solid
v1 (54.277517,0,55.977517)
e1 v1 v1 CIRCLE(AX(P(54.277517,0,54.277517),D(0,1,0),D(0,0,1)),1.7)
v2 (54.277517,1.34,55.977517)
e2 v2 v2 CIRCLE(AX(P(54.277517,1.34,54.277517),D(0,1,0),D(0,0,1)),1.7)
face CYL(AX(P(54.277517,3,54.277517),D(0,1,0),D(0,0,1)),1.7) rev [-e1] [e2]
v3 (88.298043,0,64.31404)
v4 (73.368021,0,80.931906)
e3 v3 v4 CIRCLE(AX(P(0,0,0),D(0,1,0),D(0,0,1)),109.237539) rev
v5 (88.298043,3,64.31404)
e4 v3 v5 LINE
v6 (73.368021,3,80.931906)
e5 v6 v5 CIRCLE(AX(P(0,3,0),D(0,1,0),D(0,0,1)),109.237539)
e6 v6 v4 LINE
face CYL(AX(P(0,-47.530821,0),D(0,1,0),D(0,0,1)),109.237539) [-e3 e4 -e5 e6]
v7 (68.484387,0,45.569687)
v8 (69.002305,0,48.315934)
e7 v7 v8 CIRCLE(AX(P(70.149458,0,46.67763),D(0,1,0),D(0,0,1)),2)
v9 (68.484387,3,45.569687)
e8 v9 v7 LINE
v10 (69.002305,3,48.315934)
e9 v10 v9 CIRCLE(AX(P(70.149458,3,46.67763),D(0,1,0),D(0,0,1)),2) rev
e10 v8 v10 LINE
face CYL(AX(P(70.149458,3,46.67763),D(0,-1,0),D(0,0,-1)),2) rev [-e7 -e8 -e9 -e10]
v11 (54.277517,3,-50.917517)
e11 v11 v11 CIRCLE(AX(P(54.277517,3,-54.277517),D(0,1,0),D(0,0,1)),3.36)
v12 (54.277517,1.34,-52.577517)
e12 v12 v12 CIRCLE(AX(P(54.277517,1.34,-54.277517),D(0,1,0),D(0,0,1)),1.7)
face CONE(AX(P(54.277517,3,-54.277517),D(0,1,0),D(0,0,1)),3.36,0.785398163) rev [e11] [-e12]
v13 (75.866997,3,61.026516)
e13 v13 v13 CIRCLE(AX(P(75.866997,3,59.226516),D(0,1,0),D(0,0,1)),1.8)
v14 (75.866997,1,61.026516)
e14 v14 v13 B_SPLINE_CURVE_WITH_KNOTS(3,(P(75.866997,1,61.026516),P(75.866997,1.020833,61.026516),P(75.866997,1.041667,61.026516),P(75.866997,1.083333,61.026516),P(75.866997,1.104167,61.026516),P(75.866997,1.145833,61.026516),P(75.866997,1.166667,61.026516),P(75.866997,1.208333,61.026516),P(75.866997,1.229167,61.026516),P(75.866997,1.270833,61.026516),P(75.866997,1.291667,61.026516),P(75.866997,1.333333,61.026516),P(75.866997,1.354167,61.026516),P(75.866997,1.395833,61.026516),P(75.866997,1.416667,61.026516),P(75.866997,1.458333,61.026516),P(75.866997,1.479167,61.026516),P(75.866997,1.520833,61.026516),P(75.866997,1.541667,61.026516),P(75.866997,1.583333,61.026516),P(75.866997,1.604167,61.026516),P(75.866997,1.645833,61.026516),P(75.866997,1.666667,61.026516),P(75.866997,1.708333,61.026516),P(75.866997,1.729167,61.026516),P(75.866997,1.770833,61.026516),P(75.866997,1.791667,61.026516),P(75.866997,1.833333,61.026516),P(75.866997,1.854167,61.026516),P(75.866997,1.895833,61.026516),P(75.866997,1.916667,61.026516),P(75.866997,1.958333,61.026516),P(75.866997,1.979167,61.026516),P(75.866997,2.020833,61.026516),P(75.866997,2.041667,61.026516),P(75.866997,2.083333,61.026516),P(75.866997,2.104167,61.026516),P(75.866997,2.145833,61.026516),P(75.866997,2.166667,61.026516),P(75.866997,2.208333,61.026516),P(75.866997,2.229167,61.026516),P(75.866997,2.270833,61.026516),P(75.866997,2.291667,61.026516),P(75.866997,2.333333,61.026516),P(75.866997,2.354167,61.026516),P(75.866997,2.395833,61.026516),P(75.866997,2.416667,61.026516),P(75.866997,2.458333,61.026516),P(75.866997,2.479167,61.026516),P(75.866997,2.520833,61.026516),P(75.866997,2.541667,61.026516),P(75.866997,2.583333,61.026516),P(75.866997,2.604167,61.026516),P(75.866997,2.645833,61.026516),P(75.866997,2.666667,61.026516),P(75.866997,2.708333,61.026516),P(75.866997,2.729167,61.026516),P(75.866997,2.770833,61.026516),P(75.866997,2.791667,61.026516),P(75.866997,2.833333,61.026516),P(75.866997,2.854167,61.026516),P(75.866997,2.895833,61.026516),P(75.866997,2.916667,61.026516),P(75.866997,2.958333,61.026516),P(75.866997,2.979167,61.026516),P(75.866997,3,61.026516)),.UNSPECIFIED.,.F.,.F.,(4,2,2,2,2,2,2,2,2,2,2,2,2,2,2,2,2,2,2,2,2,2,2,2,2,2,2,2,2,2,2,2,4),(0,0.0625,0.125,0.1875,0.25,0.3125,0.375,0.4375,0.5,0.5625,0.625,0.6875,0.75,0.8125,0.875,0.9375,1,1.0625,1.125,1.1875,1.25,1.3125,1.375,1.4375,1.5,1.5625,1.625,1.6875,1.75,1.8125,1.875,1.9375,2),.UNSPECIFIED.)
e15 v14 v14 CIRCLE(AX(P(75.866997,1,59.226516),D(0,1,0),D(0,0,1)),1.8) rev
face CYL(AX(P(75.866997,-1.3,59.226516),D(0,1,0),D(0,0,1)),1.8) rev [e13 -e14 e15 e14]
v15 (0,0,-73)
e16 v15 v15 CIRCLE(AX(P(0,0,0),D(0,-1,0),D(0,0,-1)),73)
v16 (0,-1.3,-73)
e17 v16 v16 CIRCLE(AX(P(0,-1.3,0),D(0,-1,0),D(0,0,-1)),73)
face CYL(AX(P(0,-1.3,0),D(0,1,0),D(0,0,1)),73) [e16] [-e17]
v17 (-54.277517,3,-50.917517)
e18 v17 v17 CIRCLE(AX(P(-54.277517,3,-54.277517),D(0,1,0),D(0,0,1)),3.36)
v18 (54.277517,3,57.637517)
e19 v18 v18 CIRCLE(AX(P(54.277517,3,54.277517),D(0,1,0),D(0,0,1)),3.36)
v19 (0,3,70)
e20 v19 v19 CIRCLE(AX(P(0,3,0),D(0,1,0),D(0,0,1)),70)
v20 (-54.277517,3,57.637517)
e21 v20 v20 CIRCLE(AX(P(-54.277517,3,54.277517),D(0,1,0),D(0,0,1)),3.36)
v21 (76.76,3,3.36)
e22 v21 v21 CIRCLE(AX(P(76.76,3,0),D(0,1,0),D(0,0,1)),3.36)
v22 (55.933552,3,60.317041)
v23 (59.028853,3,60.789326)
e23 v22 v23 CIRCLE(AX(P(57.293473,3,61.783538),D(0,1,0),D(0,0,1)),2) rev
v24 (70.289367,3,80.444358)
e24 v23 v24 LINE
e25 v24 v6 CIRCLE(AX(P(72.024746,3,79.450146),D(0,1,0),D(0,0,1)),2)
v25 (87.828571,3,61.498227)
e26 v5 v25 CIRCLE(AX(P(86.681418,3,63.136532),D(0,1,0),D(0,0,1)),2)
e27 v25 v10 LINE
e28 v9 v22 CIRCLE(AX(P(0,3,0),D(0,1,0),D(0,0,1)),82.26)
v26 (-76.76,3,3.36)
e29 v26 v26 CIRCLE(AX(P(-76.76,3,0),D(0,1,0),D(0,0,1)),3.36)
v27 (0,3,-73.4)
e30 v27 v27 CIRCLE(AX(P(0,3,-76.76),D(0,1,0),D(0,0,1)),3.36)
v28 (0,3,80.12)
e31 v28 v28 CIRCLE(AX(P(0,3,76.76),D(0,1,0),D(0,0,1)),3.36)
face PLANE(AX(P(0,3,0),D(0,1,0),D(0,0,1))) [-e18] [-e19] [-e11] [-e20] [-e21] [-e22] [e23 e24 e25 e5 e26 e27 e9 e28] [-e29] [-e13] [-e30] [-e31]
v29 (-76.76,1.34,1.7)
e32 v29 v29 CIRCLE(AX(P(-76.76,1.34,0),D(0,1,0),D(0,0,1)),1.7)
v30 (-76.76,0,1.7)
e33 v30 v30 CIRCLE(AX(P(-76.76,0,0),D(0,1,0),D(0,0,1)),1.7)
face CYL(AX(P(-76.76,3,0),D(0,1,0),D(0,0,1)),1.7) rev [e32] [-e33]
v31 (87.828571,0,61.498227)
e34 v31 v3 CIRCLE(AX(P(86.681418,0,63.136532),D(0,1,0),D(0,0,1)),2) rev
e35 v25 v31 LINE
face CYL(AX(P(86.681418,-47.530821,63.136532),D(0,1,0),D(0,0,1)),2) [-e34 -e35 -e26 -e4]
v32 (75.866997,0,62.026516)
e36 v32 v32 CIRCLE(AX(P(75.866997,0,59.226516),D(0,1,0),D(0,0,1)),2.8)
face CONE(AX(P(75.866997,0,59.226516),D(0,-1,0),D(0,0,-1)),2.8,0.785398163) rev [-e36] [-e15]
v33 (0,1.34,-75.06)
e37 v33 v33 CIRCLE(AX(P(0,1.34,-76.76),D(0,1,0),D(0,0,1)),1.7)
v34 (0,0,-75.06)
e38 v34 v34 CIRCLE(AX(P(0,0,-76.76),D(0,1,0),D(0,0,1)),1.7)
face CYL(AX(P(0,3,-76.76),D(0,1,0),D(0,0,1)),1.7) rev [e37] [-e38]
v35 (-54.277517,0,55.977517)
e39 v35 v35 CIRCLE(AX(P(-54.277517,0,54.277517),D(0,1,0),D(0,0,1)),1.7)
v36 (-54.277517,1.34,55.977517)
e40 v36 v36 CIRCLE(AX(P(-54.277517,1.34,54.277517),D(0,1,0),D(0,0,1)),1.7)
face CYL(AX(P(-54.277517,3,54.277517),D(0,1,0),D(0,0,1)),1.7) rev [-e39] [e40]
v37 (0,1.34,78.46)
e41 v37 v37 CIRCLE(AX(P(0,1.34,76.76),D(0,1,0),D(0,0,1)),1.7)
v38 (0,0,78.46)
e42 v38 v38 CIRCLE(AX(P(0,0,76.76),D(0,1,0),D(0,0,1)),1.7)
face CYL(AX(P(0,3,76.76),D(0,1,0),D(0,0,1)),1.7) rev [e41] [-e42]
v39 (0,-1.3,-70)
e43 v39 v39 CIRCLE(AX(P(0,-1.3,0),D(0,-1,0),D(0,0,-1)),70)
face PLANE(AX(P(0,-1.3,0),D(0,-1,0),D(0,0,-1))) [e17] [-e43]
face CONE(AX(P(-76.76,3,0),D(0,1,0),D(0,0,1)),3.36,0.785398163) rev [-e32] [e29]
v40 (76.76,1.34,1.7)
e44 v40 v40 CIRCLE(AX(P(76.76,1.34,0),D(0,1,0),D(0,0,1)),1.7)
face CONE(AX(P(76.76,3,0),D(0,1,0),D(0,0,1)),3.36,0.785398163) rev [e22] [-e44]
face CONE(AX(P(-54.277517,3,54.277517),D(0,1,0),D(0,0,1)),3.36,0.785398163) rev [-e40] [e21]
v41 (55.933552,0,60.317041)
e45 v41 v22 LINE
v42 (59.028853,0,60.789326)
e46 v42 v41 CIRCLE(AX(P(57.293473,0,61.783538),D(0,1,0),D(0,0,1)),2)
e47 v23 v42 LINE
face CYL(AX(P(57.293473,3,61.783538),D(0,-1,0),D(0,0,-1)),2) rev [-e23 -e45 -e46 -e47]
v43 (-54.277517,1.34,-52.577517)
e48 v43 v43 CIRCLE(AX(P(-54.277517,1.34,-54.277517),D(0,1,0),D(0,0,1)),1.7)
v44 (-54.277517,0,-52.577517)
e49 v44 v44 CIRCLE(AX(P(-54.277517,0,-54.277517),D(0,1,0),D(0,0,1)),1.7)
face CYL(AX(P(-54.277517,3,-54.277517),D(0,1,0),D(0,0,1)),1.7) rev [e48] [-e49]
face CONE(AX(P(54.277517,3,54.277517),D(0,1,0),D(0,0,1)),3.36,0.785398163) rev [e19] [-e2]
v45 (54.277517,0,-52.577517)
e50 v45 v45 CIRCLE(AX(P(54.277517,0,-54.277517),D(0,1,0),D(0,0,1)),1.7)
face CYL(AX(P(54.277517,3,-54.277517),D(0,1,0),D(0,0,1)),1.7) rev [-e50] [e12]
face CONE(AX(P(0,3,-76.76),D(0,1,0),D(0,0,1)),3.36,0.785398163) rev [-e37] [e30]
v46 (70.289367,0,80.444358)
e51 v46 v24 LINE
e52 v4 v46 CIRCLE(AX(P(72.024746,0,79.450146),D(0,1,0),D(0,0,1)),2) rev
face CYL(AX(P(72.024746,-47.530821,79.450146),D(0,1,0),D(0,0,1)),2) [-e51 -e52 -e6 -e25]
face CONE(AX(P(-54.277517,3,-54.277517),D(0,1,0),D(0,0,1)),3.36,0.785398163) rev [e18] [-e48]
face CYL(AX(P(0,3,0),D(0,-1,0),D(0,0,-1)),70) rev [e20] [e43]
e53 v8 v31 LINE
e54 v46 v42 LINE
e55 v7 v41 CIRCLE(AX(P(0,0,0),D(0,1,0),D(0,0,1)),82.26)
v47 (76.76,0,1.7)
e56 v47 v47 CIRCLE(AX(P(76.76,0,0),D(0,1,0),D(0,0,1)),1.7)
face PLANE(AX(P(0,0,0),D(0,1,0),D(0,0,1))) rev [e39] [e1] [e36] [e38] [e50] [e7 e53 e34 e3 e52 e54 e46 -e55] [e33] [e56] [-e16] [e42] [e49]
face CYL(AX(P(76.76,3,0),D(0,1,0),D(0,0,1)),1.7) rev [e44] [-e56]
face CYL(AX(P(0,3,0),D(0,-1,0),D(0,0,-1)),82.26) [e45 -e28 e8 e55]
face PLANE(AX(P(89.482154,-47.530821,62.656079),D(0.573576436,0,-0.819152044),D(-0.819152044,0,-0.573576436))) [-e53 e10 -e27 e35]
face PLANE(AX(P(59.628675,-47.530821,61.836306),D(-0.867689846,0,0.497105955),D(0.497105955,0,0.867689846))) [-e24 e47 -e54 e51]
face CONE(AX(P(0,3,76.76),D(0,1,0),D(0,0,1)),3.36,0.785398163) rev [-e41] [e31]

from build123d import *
from build123d.topology import SkipClean

# Parameters (mm, degrees)
ESBO_O1_R                                    = 82.26
ESBO_O1_R_2                                  = 70
RESSALTO_EXTRUS_O1_DEPTH                     = 3
RESSALTO_EXTRUS_O2_START                     = 1.3
ESBO_O2_R                                    = 73
ESBO_O2_R_2                                  = 70
RESSALTO_EXTRUS_O2_DEPTH                     = 1.3
ESCAREADO_PARA_PARAFUSO_ALLEN_SEXTAV_2_COUNT = 2
ESCAREADO_PARA_PARAFUSO_ALLEN_SEXTAV_2_PITCH = 76.76
ESCAREADO_PARA_PARAFUSO_ALLEN_SEXTAV_3_COUNT = 2
ESCAREADO_PARA_PARAFUSO_ALLEN_SEXTAV_3_PITCH = 76.76
ESCAREADO_PARA_PARAFUSO_ALLEN_SEXTAV_4_COUNT = 2
ESCAREADO_PARA_PARAFUSO_ALLEN_SEXTAV_4_PITCH = 76.76
ESCAREADO_PARA_PARAFUSO_ALLEN_SEXTAV_5_COUNT = 2
ESCAREADO_PARA_PARAFUSO_ALLEN_SEXTAV_5_PITCH = 76.76
ESCAREADO_PARA_PARAFUSO_ALLEN_SEXTAV_6_COUNT = 2
ESCAREADO_PARA_PARAFUSO_ALLEN_SEXTAV_6_PITCH = 76.76
ESCAREADO_PARA_PARAFUSO_ALLEN_SEXTAV_7_COUNT = 2
ESCAREADO_PARA_PARAFUSO_ALLEN_SEXTAV_7_PITCH = 76.76
ESCAREADO_PARA_PARAFUSO_ALLEN_SEXTAV_8_COUNT = 2
ESCAREADO_PARA_PARAFUSO_ALLEN_SEXTAV_8_PITCH = 76.76
ESCAREADO_PARA_PARAFUSO_ALLEN_SEXTAV_9_COUNT = 2
ESCAREADO_PARA_PARAFUSO_ALLEN_SEXTAV_9_PITCH = 76.76
RESSALTO_EXTRUS_O3_START                     = -3
RESSALTO_EXTRUS_O3_DEPTH                     = 3
FILETE1_R                                    = 2
ESBO_O9_R                                    = 1.8
CORTE_EXTRUS_O3_DEPTH                        = 122.035496877
CHANFRO2_SIZE                                = 1


with BuildPart() as part:
    # Esboço1 → Ressalto-extrusão1 (new body)
    with BuildSketch(Plane(origin=(0, 0, 0), x_dir=(1, 0, 0), z_dir=(0, 1, 0))):
        with Locations(Location((0, 0, 0), (0, 0, 270))):
            Circle(ESBO_O1_R)
        with Locations(Location((0, 0, 0), (0, 0, 270))):
            Circle(ESBO_O1_R_2, mode=Mode.SUBTRACT)
    extrude(amount=RESSALTO_EXTRUS_O1_DEPTH)

    # Esboço2 → Ressalto-extrusão2 (add)
    with SkipClean():  # the faces are left unmerged after this step: merging them gives an invalid solid
        with BuildSketch(Plane.XZ.offset(RESSALTO_EXTRUS_O2_START)):
            with Locations(Location((0, 0, 0), (0, 0, 270))):
                Circle(ESBO_O2_R)
            with Locations(Location((0, 0, 0), (0, 0, 270))):
                Circle(ESBO_O2_R_2, mode=Mode.SUBTRACT)
        extrude(amount=-RESSALTO_EXTRUS_O2_DEPTH)

    # Esboço4 → Escareado para parafuso Allen sextavado escareado de M31 (revolve, cut)
    with SkipClean():  # the faces are left unmerged after this step: merging them gives an invalid solid
        with BuildSketch(Plane(origin=(0, 3, 0), x_dir=(0, 0, 1), z_dir=(1, 0, 0))):
            Polygon((0, 0), (0, 3), (1.7, 3), (1.7, 1.66), (3.36, 0), align=None)
        escareado_para_parafuso_allen_sextavado = revolve(axis=Axis((0, 9.35, 0), (0, -1, 0)), mode=Mode.SUBTRACT)

    # Escareado para parafuso Allen sextav 2: Escareado para parafuso Allen sextavado escareado de M31 ×2
    with SkipClean():  # the faces are left unmerged after this step: merging them gives an invalid solid
        with Locations(*[(-i * ESCAREADO_PARA_PARAFUSO_ALLEN_SEXTAV_2_PITCH, 0, 0) for i in range(1, ESCAREADO_PARA_PARAFUSO_ALLEN_SEXTAV_2_COUNT)]):
            add(escareado_para_parafuso_allen_sextavado, mode=Mode.SUBTRACT)

    # Escareado para parafuso Allen sextav 3: Escareado para parafuso Allen sextavado escareado de M31 ×2
    with SkipClean():  # the faces are left unmerged after this step: merging them gives an invalid solid
        with Locations(*[Vector(-0.7071067811865477, 0, -0.7071067811865475) * (i * ESCAREADO_PARA_PARAFUSO_ALLEN_SEXTAV_3_PITCH) for i in range(1, ESCAREADO_PARA_PARAFUSO_ALLEN_SEXTAV_3_COUNT)]):
            add(escareado_para_parafuso_allen_sextavado, mode=Mode.SUBTRACT)

    # Escareado para parafuso Allen sextav 4: Escareado para parafuso Allen sextavado escareado de M31 ×2
    with SkipClean():  # the faces are left unmerged after this step: merging them gives an invalid solid
        with Locations(*[(0, 0, -i * ESCAREADO_PARA_PARAFUSO_ALLEN_SEXTAV_4_PITCH) for i in range(1, ESCAREADO_PARA_PARAFUSO_ALLEN_SEXTAV_4_COUNT)]):
            add(escareado_para_parafuso_allen_sextavado, mode=Mode.SUBTRACT)

    # Escareado para parafuso Allen sextav 5: Escareado para parafuso Allen sextavado escareado de M31 ×2
    with SkipClean():  # the faces are left unmerged after this step: merging them gives an invalid solid
        with Locations(*[Vector(0.7071067811865475, 0, -0.7071067811865476) * (i * ESCAREADO_PARA_PARAFUSO_ALLEN_SEXTAV_5_PITCH) for i in range(1, ESCAREADO_PARA_PARAFUSO_ALLEN_SEXTAV_5_COUNT)]):
            add(escareado_para_parafuso_allen_sextavado, mode=Mode.SUBTRACT)

    # Escareado para parafuso Allen sextav 6: Escareado para parafuso Allen sextavado escareado de M31 ×2
    with SkipClean():  # the faces are left unmerged after this step: merging them gives an invalid solid
        with Locations(*[(i * ESCAREADO_PARA_PARAFUSO_ALLEN_SEXTAV_6_PITCH, 0, 0) for i in range(1, ESCAREADO_PARA_PARAFUSO_ALLEN_SEXTAV_6_COUNT)]):
            add(escareado_para_parafuso_allen_sextavado, mode=Mode.SUBTRACT)

    # Escareado para parafuso Allen sextav 7: Escareado para parafuso Allen sextavado escareado de M31 ×2
    with SkipClean():  # the faces are left unmerged after this step: merging them gives an invalid solid
        with Locations(*[Vector(0.7071067811865477, 0, 0.7071067811865475) * (i * ESCAREADO_PARA_PARAFUSO_ALLEN_SEXTAV_7_PITCH) for i in range(1, ESCAREADO_PARA_PARAFUSO_ALLEN_SEXTAV_7_COUNT)]):
            add(escareado_para_parafuso_allen_sextavado, mode=Mode.SUBTRACT)

    # Escareado para parafuso Allen sextav 8: Escareado para parafuso Allen sextavado escareado de M31 ×2
    with SkipClean():  # the faces are left unmerged after this step: merging them gives an invalid solid
        with Locations(*[(0, 0, i * ESCAREADO_PARA_PARAFUSO_ALLEN_SEXTAV_8_PITCH) for i in range(1, ESCAREADO_PARA_PARAFUSO_ALLEN_SEXTAV_8_COUNT)]):
            add(escareado_para_parafuso_allen_sextavado, mode=Mode.SUBTRACT)

    # Escareado para parafuso Allen sextav 9: Escareado para parafuso Allen sextavado escareado de M31 ×2
    with SkipClean():  # the faces are left unmerged after this step: merging them gives an invalid solid
        with Locations(*[Vector(-0.7071067811865475, 0, 0.7071067811865476) * (i * ESCAREADO_PARA_PARAFUSO_ALLEN_SEXTAV_9_PITCH) for i in range(1, ESCAREADO_PARA_PARAFUSO_ALLEN_SEXTAV_9_COUNT)]):
            add(escareado_para_parafuso_allen_sextavado, mode=Mode.SUBTRACT)

    # Esboço5 → Ressalto-extrusão3 (add)
    with SkipClean():  # the faces are left unmerged after this step: merging them gives an invalid solid
        with BuildSketch(Plane(origin=(0, 3, 0), x_dir=(1, 0, 0), z_dir=(0, 1, 0)).offset(RESSALTO_EXTRUS_O3_START)):
            with BuildLine():
                Line((59.628675028, -61.836305796), (71.511245178, -82.577126452))
                ThreePointArc((71.511245178, -82.577126452), (81.110607536, -73.170413044), (89.482153659, -62.656078528))
                Line((89.482153659, -62.656078528), (67.383447163, -47.182397654))
                ThreePointArc((67.383447163, -47.182397654), (62.829570926, -53.09569302), (57.758469462, -58.57189433))
                Line((57.758469462, -58.57189433), (59.628675028, -61.836305796))
            make_face()
        extrude(amount=RESSALTO_EXTRUS_O3_DEPTH)
    add(part.part.scale(1), mode=Mode.REPLACE)  # the faces are merged on a copy

    # Filete1
    # the kernel refuses this fillet: 2 mm, written as the material it adds along each edge
    with BuildSketch(Plane(origin=(57.758469462, 0, 58.57189433), x_dir=(-0.7227263558173935, 0, 0.6911342956379103), z_dir=(0, 1, 0))) as filete1_piece_1:
        with BuildLine():
            CenterArc((2.55574236, 1.999764426), FILETE1_R, 166.088750143, 103.031841977)
            Line((0.61440377, 2.480601697), (0, 0))
            ThreePointArc((0, 0), (1.26252322, 0.009689149), (2.525046439, 0))
        make_face()
    extrude(amount=3)
    with BuildSketch(Plane(origin=(67.383447163, 0, 47.182397654), x_dir=(0.5638136312570139, 0, -0.8259020457710344), z_dir=(0, 1, 0))) as filete1_piece_2:
        with BuildLine():
            CenterArc((1.976403158, -1.999859125), FILETE1_R, 90.680051756, 88.639896488)
            Line((-0.023455967, -1.976121398), (0, 0))
            ThreePointArc((0, 0), (0.976332715, -0.005794184), (1.952665431, 0))
        make_face()
    extrude(amount=3)
    # the kernel refuses this fillet: 2 mm, written as the material it takes off along each edge
    with BuildSketch(Plane(origin=(89.482153659, -5.093472409, 62.656078528), x_dir=(-0.5811904962497088, 0, 0.8137675387166886), z_dir=(0, 1, 0))) as filete1_2_piece_1:
        with BuildLine():
            CenterArc((2.018737967, -1.999913033), FILETE1_R, 89.465680564, 91.068638872)
            Line((0.018824934, -2.01856403), (0, 0))
            ThreePointArc((0, 0), (1.018694482, 0.00475002), (2.037388964, 0))
        make_face()
    extrude(amount=13.186944818, mode=Mode.SUBTRACT)
    with BuildSketch(Plane(origin=(71.511245178, -6.20199849, 82.577126452), x_dir=(-0.4971059552935667, 0, -0.8676898462075434), z_dir=(0, 1, 0))) as filete1_2_piece_2:
        with BuildLine():
            CenterArc((2.457984349, -2), FILETE1_R, 90, 102.384853671)
            ThreePointArc((0.504526328, -2.428954266), (0.245367707, -1.215909412), (0, 0))
            Line((0, 0), (2.457984349, 0))
        make_face()
    extrude(amount=15.40399698, mode=Mode.SUBTRACT)

    # Esboço9 → Corte-extrusão3 (cut, through all)
    with BuildSketch(Plane(origin=(0, 3, 0), x_dir=(1, 0, 0), z_dir=(0, 1, 0))):
        with Locations(Location((75.866996657, -59.226515904, 0), (0, 0, 270))):
            Circle(ESBO_O9_R)
    extrude(amount=-CORTE_EXTRUS_O3_DEPTH, mode=Mode.SUBTRACT)

    # Chanfro2
    chanfro2_edges = [part.edges().sort_by_distance(p)[0] for p in [
        (75.866996657, 0, 57.426515904),
    ]]
    chamfer(chanfro2_edges, length=CHANFRO2_SIZE)


solid = part.part
